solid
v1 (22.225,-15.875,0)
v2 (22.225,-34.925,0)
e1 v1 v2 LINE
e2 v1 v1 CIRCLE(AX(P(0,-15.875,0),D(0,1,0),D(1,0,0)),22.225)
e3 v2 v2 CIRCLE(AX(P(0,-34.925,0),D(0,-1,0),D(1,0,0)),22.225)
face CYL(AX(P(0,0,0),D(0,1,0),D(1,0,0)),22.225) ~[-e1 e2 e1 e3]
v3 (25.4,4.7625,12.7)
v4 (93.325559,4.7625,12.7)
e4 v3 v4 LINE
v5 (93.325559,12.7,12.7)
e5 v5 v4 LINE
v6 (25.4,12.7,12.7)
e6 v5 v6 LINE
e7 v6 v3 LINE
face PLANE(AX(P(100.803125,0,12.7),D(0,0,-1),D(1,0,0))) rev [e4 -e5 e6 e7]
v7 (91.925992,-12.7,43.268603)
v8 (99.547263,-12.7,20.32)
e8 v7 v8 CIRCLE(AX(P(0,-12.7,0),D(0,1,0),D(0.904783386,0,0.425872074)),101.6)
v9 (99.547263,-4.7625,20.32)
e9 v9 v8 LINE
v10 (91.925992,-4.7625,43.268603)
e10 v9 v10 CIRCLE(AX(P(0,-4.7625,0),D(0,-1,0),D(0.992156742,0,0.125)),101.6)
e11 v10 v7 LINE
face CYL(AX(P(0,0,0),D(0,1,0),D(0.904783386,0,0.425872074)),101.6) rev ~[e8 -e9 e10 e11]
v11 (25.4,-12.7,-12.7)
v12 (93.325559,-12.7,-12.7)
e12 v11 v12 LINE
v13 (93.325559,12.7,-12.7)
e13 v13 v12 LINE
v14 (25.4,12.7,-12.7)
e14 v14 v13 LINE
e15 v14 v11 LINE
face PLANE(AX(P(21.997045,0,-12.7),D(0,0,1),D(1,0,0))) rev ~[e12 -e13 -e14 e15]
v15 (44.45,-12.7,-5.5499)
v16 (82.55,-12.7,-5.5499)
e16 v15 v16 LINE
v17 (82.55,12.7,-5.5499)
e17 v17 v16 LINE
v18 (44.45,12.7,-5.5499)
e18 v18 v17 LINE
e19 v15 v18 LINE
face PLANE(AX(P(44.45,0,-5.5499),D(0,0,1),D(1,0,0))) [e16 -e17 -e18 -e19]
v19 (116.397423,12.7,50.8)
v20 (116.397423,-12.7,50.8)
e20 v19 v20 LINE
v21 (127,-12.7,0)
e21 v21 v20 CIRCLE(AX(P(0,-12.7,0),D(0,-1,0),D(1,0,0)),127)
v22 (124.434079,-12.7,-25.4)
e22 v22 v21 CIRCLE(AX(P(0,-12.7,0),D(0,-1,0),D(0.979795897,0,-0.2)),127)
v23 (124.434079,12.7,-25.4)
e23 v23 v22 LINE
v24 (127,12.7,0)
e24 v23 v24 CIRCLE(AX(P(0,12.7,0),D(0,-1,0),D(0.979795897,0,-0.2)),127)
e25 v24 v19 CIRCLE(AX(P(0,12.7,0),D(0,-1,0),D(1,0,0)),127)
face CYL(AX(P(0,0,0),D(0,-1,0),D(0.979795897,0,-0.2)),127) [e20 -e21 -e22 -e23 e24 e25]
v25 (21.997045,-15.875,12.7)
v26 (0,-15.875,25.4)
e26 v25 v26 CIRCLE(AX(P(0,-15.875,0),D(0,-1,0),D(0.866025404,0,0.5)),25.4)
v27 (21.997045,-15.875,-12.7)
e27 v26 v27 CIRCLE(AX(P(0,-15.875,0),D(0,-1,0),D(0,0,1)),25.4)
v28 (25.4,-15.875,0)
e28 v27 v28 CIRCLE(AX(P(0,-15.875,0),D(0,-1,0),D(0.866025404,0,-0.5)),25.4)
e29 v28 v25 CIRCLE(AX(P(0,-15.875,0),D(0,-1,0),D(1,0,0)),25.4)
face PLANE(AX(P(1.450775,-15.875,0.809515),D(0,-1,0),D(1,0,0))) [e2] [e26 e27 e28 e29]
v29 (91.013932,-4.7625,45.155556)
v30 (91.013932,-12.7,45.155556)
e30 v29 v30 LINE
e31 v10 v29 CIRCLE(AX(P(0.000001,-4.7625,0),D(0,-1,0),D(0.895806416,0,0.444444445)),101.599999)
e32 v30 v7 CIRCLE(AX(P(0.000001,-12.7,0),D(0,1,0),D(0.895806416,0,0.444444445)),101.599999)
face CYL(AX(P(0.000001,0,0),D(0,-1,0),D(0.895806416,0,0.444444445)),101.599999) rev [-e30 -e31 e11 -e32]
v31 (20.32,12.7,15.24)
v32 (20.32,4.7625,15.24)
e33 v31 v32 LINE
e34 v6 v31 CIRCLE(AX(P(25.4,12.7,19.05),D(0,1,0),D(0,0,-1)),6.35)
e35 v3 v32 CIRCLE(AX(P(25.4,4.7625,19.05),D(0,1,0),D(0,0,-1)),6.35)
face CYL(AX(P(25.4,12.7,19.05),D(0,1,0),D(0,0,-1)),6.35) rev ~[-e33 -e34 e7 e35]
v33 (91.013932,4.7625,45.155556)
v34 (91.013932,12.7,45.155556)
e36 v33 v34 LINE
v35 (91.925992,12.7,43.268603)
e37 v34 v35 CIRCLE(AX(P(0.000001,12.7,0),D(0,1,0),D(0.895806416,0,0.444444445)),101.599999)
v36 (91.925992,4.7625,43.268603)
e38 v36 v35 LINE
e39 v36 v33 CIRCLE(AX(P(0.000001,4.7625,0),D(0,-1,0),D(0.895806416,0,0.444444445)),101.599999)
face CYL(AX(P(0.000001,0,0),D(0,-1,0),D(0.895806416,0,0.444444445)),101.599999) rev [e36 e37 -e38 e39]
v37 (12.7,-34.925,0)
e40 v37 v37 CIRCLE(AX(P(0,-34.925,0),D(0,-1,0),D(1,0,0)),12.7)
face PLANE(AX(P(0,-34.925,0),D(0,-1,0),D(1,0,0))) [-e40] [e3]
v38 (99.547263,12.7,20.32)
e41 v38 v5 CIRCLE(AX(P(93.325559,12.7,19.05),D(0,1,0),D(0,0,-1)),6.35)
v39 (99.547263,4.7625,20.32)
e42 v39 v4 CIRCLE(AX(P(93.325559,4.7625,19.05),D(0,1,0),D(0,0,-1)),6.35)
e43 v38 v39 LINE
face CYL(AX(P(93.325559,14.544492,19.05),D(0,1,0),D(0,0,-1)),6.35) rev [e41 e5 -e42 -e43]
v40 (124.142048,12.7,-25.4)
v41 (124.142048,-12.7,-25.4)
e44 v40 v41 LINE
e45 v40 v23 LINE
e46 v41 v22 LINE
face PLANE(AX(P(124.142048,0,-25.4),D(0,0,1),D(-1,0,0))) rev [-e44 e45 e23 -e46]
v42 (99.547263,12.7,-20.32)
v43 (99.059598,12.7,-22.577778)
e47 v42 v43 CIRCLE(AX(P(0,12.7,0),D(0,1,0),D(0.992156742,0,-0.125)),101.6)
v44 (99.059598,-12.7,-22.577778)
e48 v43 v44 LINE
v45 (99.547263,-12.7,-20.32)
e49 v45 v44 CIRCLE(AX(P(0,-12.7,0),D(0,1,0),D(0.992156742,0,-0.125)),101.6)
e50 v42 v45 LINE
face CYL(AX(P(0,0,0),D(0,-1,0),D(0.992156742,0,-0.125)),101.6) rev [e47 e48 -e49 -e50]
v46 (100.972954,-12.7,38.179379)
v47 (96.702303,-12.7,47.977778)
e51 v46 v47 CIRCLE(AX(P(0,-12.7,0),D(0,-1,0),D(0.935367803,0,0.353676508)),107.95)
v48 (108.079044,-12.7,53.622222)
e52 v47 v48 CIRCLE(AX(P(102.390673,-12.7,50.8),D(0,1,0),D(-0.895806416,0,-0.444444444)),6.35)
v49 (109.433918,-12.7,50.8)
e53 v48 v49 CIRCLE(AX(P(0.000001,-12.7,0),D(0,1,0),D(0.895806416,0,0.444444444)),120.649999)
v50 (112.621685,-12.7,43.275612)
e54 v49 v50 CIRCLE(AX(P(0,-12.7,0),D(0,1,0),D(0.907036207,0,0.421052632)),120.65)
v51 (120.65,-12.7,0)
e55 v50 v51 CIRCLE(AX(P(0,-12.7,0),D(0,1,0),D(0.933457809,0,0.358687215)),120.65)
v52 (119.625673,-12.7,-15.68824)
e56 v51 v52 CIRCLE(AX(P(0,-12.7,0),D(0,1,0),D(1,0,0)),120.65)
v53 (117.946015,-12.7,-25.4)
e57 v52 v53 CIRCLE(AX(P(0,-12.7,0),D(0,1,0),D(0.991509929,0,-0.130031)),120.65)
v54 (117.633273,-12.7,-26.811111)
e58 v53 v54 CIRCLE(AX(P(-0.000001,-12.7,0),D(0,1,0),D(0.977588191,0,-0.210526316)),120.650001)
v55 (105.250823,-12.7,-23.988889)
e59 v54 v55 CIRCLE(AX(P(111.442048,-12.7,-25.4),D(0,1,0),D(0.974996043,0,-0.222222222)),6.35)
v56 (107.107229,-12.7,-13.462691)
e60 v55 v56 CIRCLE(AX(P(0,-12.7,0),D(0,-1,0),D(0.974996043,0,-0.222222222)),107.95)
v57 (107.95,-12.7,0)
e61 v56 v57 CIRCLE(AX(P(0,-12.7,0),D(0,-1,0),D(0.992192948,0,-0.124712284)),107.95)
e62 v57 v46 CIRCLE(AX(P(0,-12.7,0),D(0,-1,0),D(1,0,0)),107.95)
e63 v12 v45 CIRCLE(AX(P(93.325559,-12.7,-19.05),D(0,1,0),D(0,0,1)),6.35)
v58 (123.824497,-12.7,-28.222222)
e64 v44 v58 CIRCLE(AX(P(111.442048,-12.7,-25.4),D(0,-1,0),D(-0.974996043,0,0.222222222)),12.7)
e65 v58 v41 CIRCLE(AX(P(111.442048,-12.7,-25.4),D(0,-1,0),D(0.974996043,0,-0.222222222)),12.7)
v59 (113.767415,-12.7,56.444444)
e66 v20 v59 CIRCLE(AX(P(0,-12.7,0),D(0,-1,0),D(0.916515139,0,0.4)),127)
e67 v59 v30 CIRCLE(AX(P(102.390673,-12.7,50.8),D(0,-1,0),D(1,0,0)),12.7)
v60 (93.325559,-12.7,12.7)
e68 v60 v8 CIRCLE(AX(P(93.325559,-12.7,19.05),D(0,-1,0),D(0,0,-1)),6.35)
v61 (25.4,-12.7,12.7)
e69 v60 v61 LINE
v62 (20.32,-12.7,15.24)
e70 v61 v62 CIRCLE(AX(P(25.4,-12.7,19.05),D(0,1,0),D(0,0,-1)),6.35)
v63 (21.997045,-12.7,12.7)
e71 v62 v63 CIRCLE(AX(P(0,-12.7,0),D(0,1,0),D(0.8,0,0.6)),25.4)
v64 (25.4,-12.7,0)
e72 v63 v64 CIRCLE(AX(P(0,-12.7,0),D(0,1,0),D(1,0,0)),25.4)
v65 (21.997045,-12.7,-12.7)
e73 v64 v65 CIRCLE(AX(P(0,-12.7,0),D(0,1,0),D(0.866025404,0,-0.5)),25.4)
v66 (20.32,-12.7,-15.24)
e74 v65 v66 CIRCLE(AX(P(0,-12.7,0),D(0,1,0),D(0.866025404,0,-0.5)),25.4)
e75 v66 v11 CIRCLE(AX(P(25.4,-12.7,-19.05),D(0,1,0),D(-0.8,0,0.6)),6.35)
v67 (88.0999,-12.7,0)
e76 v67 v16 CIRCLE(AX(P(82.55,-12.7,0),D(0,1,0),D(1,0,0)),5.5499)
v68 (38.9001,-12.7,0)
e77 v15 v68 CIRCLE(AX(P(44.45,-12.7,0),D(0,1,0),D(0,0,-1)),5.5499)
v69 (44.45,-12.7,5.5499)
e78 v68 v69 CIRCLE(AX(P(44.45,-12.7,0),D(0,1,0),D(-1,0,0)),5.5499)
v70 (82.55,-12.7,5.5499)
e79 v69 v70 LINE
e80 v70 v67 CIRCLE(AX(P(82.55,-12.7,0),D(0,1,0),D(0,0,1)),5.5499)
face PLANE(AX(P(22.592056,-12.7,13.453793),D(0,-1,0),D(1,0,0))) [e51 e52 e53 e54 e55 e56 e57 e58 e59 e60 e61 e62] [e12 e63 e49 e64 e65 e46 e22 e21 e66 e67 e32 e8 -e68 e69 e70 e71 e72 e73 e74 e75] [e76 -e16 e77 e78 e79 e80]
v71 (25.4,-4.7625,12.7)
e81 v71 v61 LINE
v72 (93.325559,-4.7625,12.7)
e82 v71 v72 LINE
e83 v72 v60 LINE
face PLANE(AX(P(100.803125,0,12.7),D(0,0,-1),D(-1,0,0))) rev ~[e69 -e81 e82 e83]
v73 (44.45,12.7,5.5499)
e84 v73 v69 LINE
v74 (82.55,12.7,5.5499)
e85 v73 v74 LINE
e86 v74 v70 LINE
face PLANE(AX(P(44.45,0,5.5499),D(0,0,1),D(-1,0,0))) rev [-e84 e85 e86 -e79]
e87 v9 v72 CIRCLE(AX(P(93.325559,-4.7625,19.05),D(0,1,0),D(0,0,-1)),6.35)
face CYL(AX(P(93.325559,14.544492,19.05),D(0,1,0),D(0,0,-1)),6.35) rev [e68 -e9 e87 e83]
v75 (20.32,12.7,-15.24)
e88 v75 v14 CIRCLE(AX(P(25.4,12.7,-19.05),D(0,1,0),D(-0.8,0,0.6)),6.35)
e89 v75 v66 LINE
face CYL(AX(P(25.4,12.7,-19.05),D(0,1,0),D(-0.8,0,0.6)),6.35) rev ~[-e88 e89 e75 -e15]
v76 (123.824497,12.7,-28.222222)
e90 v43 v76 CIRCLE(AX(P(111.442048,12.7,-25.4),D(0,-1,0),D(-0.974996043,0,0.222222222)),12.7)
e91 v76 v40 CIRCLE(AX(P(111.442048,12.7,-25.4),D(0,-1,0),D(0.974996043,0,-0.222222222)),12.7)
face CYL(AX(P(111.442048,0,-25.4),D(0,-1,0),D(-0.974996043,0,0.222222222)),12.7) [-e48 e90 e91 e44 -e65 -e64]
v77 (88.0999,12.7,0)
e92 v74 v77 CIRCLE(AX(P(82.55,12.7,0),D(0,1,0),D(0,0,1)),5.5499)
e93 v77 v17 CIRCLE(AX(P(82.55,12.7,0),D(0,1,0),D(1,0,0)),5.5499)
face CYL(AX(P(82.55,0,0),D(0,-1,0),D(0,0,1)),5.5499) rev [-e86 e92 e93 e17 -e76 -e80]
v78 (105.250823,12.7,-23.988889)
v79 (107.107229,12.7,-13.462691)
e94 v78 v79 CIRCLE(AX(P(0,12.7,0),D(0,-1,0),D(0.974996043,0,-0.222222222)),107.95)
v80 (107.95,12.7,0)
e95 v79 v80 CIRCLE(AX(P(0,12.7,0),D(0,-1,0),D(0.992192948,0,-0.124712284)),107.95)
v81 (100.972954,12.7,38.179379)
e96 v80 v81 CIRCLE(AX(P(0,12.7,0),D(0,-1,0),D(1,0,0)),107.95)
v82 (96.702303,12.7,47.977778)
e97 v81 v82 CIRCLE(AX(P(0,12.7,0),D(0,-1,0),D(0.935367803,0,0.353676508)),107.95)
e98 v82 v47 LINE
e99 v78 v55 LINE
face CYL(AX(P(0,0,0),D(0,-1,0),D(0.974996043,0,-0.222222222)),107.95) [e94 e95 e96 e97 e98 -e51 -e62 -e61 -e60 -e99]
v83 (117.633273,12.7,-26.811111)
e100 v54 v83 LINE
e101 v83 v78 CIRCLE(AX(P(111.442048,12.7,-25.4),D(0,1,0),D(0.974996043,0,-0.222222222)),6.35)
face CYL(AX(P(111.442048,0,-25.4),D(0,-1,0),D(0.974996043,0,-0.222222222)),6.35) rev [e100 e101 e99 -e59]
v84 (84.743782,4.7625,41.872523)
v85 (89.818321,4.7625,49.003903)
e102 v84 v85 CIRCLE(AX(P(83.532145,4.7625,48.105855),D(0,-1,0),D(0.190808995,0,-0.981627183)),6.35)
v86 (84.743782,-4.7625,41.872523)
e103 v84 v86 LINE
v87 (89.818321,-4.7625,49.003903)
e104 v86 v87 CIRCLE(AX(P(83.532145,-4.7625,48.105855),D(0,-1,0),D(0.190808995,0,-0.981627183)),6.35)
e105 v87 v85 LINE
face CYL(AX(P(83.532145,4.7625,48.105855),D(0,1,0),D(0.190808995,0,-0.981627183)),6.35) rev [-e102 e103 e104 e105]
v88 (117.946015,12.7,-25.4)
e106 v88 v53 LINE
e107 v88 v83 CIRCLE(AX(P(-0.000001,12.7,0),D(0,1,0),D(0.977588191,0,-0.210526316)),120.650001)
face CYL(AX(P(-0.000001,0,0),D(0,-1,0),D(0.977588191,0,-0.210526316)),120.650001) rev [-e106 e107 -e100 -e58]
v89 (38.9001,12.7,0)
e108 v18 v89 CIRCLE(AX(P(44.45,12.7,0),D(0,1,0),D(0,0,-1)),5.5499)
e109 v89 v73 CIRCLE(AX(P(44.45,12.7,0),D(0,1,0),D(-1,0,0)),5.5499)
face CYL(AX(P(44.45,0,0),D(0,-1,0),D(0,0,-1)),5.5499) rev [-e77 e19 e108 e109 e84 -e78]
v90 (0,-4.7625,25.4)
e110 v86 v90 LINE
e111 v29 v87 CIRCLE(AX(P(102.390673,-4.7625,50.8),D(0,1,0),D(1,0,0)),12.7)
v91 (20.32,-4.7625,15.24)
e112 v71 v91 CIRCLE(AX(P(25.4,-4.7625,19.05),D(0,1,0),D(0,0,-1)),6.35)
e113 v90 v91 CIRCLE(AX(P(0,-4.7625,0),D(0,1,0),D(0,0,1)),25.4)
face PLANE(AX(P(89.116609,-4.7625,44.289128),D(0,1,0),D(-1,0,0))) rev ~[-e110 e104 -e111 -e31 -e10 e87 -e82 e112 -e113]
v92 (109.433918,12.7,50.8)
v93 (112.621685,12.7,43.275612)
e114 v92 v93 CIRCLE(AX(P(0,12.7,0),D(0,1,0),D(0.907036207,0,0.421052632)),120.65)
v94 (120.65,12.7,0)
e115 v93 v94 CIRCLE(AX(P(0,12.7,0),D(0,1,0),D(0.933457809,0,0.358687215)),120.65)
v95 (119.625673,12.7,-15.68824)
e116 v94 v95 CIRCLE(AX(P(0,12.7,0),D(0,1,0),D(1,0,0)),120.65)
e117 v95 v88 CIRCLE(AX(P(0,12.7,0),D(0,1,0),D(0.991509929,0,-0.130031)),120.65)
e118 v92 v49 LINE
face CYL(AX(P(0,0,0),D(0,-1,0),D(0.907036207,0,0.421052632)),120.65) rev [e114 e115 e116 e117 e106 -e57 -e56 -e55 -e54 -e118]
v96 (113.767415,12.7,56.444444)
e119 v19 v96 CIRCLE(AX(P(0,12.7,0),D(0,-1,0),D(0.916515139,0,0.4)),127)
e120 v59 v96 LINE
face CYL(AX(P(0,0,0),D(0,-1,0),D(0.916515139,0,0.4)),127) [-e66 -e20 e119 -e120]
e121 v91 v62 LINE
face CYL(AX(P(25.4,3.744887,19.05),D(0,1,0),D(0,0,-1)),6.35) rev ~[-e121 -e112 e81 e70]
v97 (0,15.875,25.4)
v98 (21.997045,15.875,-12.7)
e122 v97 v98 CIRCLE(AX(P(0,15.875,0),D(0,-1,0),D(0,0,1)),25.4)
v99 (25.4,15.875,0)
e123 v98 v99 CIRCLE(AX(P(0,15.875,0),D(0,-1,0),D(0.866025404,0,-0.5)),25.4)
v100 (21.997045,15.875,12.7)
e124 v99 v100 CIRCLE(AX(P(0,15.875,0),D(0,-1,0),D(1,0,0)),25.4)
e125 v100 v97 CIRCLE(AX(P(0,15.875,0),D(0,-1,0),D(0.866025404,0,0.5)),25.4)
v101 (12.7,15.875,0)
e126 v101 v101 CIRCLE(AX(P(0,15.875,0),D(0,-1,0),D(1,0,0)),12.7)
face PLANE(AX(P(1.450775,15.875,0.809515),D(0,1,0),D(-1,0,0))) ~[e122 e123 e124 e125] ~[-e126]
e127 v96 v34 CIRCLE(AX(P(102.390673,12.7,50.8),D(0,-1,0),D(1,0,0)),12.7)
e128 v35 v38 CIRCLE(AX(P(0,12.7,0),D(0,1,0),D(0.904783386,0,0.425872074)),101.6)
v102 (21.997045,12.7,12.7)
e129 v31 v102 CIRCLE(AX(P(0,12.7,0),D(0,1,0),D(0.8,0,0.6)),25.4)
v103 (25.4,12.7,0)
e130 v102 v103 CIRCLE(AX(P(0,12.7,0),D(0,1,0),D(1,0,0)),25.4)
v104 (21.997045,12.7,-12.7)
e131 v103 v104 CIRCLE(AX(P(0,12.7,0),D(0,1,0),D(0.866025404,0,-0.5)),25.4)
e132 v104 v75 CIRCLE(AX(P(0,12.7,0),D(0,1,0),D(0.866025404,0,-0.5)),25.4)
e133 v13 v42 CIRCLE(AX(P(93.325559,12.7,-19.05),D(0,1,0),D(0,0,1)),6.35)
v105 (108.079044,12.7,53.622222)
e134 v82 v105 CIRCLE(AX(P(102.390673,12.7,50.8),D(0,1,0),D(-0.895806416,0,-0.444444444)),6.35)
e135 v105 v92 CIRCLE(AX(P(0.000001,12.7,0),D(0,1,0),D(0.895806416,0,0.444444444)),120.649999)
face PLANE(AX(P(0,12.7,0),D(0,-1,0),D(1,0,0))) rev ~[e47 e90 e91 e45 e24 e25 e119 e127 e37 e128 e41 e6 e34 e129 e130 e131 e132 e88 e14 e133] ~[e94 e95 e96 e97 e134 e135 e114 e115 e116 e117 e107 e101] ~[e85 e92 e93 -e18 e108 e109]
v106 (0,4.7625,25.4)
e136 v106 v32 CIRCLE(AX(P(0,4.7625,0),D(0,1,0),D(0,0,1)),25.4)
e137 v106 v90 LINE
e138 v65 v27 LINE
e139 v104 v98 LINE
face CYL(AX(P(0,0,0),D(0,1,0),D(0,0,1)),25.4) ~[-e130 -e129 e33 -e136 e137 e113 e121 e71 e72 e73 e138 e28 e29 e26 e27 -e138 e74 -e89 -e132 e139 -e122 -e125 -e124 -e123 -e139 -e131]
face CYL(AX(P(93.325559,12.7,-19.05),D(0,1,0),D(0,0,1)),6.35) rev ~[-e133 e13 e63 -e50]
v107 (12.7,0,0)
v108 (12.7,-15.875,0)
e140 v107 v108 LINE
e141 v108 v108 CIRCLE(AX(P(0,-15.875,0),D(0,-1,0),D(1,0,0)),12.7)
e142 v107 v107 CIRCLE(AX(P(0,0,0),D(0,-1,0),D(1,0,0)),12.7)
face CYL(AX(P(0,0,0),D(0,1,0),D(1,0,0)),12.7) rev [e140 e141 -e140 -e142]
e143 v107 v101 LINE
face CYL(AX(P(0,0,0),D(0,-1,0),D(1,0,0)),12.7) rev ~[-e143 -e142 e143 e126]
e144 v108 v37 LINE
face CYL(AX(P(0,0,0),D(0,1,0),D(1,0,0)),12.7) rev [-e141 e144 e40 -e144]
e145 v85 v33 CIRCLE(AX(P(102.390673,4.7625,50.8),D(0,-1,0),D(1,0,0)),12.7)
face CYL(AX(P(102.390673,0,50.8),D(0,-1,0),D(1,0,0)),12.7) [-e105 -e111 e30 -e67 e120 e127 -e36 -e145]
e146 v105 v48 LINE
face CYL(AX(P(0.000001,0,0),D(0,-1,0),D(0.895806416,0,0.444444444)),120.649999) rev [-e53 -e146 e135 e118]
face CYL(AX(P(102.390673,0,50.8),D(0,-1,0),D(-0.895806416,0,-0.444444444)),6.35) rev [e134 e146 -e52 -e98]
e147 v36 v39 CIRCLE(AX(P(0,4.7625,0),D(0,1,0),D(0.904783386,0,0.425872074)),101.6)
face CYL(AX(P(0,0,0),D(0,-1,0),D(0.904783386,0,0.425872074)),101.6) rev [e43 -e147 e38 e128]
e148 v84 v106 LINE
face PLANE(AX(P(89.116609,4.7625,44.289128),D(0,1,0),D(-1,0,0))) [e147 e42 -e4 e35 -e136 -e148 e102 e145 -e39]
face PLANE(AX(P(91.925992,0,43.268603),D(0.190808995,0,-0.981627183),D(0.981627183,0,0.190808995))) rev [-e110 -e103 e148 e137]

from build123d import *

# Parameters (mm, degrees)
F0_W         = 38.1
F0_H         = 7.1501
F0_R         = 22.225
F0_R_2       = 12.7
F1_DEPTH     = 12.7
F2_DEPTH     = 15.875
F3_DEPTH     = 4.7625
F5_DEPTH     = 34.925
F6_T1_DEPTH  = 9.525
F6_T3_DEPTH  = 25.4
F6_T5_DEPTH  = 16.4448868597
F6_T7_DEPTH  = 16.4448868597
F6_T12_DEPTH = 27.2444917505
F6_T17_DEPTH = 27.2444917505


# Not quite as in the source:
# - a fillet or chamfer that OpenCascade refuses, or shapes differently, is made with other operations: its cross-section is extruded or revolved along the edge and cut away or added


with BuildPart() as f1:
    # F0 (on Front) → F1 (new body)
    with BuildSketch(Plane.XZ):
        with BuildLine():
            ThreePointArc((113.7674148927, 56.4444444444), (96.7462289589, 62.1767414893), (91.0139319141, 45.1555555556))
            ThreePointArc((91.0139319141, 45.1555555556), (95.1042946992, 40.3981402923), (100.9729543694, 38.1793790668))
            ThreePointArc((100.9729543694, 38.1793790668), (98.95897617, 43.1314680412), (96.7023026588, 47.9777777778))
            ThreePointArc((96.7023026588, 47.9777777778), (99.5684511812, 56.4883707446), (108.079044148, 53.6222222222))
            ThreePointArc((108.079044148, 53.6222222222), (108.7656354529, 52.2155057864), (109.4339184165, 50.8))
            Line((109.4339184165, 50.8), (115.0906734034, 50.8))
            ThreePointArc((115.0906734034, 50.8), (114.7554341555, 53.6987396474), (113.7674148927, 56.4444444444))
        make_face()
        with BuildLine():
            ThreePointArc((91.0139319141, 45.1555555556), (91.4748276489, 44.2144309769), (91.9259920573, 43.2686027539))
            ThreePointArc((91.9259920573, 43.2686027539), (97.5691447351, 28.3341136382), (100.8031249516, 12.7))
            ThreePointArc((100.8031249516, 12.7), (101.4005855384, 6.3624879144), (101.6, 0))
            Line((101.6, 0), (107.95, 0))
            ThreePointArc((107.95, 0), (106.1914142579, 19.405824845), (100.9729543694, 38.1793790668))
            ThreePointArc((100.9729543694, 38.1793790668), (95.1042946992, 40.3981402923), (91.0139319141, 45.1555555556))
        make_face()
        with BuildLine():
            ThreePointArc((101.6, 0), (101.4005855384, -6.3624879144), (100.8031249516, -12.7))
            ThreePointArc((100.8031249516, -12.7), (100.0533339134, -17.6604182514), (99.0595979732, -22.5777777778))
            ThreePointArc((99.0595979732, -22.5777777778), (101.9216501545, -16.9945237972), (107.1072287434, -13.462691072))
            ThreePointArc((107.1072287434, -13.462691072), (107.7391011724, -6.744522116), (107.95, 0))
            Line((107.95, 0), (101.6, 0))
        make_face()
        with BuildLine():
            ThreePointArc((124.4340789334, -25.4), (126.3568914317, -12.7646381747), (127, 0))
            Line((127, 0), (120.65, 0))
            ThreePointArc((120.65, 0), (120.3936458808, -7.8608225729), (119.625672913, -15.6882401853))
            ThreePointArc((119.625672913, -15.6882401853), (122.957733543, -20.0447240945), (124.1420477199, -25.4))
            Line((124.1420477199, -25.4), (124.4340789334, -25.4))
        make_face()
        with BuildLine():
            Line((116.3974226519, 50.8), (115.0906734034, 50.8))
            ThreePointArc((115.0906734034, 50.8), (114.4576498997, 46.8404446919), (112.6216847044, 43.2756124663))
            ThreePointArc((112.6216847044, 43.2756124663), (118.6259431145, 22.0070016178), (120.65, 0))
            Line((120.65, 0), (127, 0))
            ThreePointArc((127, 0), (124.3211017422, 25.9473247485), (116.3974226519, 50.8))
        make_face()
        with BuildLine():
            Line((117.9460151934, -25.4), (124.1420477199, -25.4))
            ThreePointArc((124.1420477199, -25.4), (122.957733543, -20.0447240945), (119.625672913, -15.6882401853))
            ThreePointArc((119.625672913, -15.6882401853), (118.885055062, -20.5612787271), (117.9460151934, -25.4))
        make_face()
        with BuildLine():
            ThreePointArc((107.1072287434, -13.462691072), (101.9216501545, -16.9945237972), (99.0595979732, -22.5777777778))
            ThreePointArc((99.0595979732, -22.5777777778), (108.6198254977, -37.7824497467), (123.8244974665, -28.2222222222))
            ThreePointArc((123.8244974665, -28.2222222222), (124.0624104679, -26.8200155312), (124.1420477199, -25.4))
            Line((124.1420477199, -25.4), (117.9460151934, -25.4))
            ThreePointArc((117.9460151934, -25.4), (117.791757, -26.1060238805), (117.6332725932, -26.8111111111))
            ThreePointArc((117.6332725932, -26.8111111111), (110.0309366088, -31.5912248733), (105.2508228466, -23.9888888889))
            ThreePointArc((105.2508228466, -23.9888888889), (106.3093868334, -18.7487805232), (107.1072287434, -13.462691072))
        make_face()
        with BuildLine():
            ThreePointArc((112.6216847044, 43.2756124663), (114.4576498997, 46.8404446919), (115.0906734034, 50.8))
            Line((115.0906734034, 50.8), (109.4339184165, 50.8))
            ThreePointArc((109.4339184165, 50.8), (111.091524525, 47.064802971), (112.6216847044, 43.2756124663))
        make_face()
        with BuildLine():
            ThreePointArc((116.3974226519, 50.8), (115.1170189362, 53.6383440391), (113.7674148927, 56.4444444444))
            ThreePointArc((113.7674148927, 56.4444444444), (114.7554341555, 53.6987396474), (115.0906734034, 50.8))
            Line((115.0906734034, 50.8), (116.3974226519, 50.8))
        make_face()
        with BuildLine():
            ThreePointArc((21.9970452561, 12.7), (24.5345159877, 6.5740037456), (25.4, 0))
            Line((25.4, 0), (38.9001, 0))
            ThreePointArc((38.9001, 0), (40.5256280751, 3.9243719249), (44.45, 5.5499))
            Line((44.45, 5.5499), (44.45, 12.7))
            Line((44.45, 12.7), (21.9970452561, 12.7))
        make_face()
        with Locations((63.5, 9.12495)):
            Rectangle(F0_W, F0_H)
        with BuildLine():
            Line((82.55, 12.7), (82.55, 5.5499))
            ThreePointArc((82.55, 5.5499), (86.4743719249, 3.9243719249), (88.0999, 0))
            Line((88.0999, 0), (101.6, 0))
            ThreePointArc((101.6, 0), (101.4005855384, 6.3624879144), (100.8031249516, 12.7))
            Line((100.8031249516, 12.7), (82.55, 12.7))
        make_face()
        with BuildLine():
            ThreePointArc((88.0999, 0), (86.4743719249, -3.9243719249), (82.55, -5.5499))
            Line((82.55, -5.5499), (82.55, -12.7))
            Line((82.55, -12.7), (100.8031249516, -12.7))
            ThreePointArc((100.8031249516, -12.7), (101.4005855384, -6.3624879144), (101.6, 0))
            Line((101.6, 0), (88.0999, 0))
        make_face()
        with Locations((63.5, -9.12495)):
            Rectangle(F0_W, F0_H)
        with BuildLine():
            Line((38.9001, 0), (25.4, 0))
            ThreePointArc((25.4, 0), (24.5345159877, -6.5740037456), (21.9970452561, -12.7))
            Line((21.9970452561, -12.7), (44.45, -12.7))
            Line((44.45, -12.7), (44.45, -5.5499))
            ThreePointArc((44.45, -5.5499), (40.5256280751, -3.9243719249), (38.9001, 0))
        make_face()
        with BuildLine():
            ThreePointArc((21.9970452561, -12.7), (24.5345159877, -6.5740037456), (25.4, 0))
            ThreePointArc((25.4, 0), (24.5345159877, 6.5740037456), (21.9970452561, 12.7))
            ThreePointArc((21.9970452561, 12.7), (12.7, 21.9970452561), (0, 25.4))
            ThreePointArc((0, 25.4), (-21.9970452561, -12.7), (21.9970452561, -12.7))
        make_face()
        Circle(F0_R, mode=Mode.SUBTRACT)
        Circle(F0_R)
        Circle(F0_R_2, mode=Mode.SUBTRACT)
    extrude(amount=F1_DEPTH)

    # F0 (on Front) → F2 (join)
    with BuildSketch(Plane.XZ):
        with BuildLine():
            ThreePointArc((21.9970452561, -12.7), (24.5345159877, -6.5740037456), (25.4, 0))
            ThreePointArc((25.4, 0), (24.5345159877, 6.5740037456), (21.9970452561, 12.7))
            ThreePointArc((21.9970452561, 12.7), (12.7, 21.9970452561), (0, 25.4))
            ThreePointArc((0, 25.4), (-21.9970452561, -12.7), (21.9970452561, -12.7))
        make_face()
        Circle(F0_R, mode=Mode.SUBTRACT)
        Circle(F0_R)
        Circle(F0_R_2, mode=Mode.SUBTRACT)
    extrude(amount=F2_DEPTH)

    # F0 (on Front) → F3 (join)
    with BuildSketch(Plane.XZ):
        with BuildLine():
            ThreePointArc((0, 25.4), (12.7, 21.9970452561), (21.9970452561, 12.7))
            Line((21.9970452561, 12.7), (44.45, 12.7))
            Line((44.45, 12.7), (82.55, 12.7))
            Line((82.55, 12.7), (100.8031249516, 12.7))
            ThreePointArc((100.8031249516, 12.7), (97.5691447351, 28.3341136382), (91.9259920573, 43.2686027539))
            Line((91.9259920573, 43.2686027539), (0, 25.4))
        make_face()
    extrude(amount=F3_DEPTH)

    # F4: F1 across face


with BuildPart() as f1_1:
    add(f1.part)
    add(f1.part.mirror(Plane.XZ))

    # F0 (on Front) → F5 (join)
    with BuildSketch(Plane.XZ):
        Circle(F0_R)
        Circle(F0_R_2, mode=Mode.SUBTRACT)
    extrude(amount=F5_DEPTH)

    # F6: fillet of radius 6.35 on 7 edges, made by hand

    # F6_s2 → F6_t1 (join)
    with BuildSketch(Plane.XZ.offset(-4.7625)):
        with BuildLine():
            ThreePointArc((84.7437823747, 41.8725226155), (88.7059686824, 44.4242725365), (89.8183213038, 49.0039034869))
            Line((89.8183213038, 49.0039034869), (90.4469389088, 49.0937083126))
            ThreePointArc((90.4469389088, 49.0937083126), (91.5827689886, 45.4377777778), (92.5005295077, 43.5390315211))
            Line((92.5005295077, 43.5390315211), (92.0471557694, 42.6452694924))
            Line((92.0471557694, 42.6452694924), (84.8649460867, 41.249189354))
            Line((84.8649460867, 41.249189354), (84.7437823747, 41.8725226155))
        make_face()
    extrude(amount=F6_T1_DEPTH)

    # F6_s4 → F6_t3 (join)
    with BuildSketch(Plane.XZ.offset(-12.7)):
        with BuildLine():
            ThreePointArc((93.3255592, -12.7), (98.2442480497, -15.0339073716), (99.5472631467, -20.32))
            ThreePointArc((99.5472631467, -20.32), (100.247621432, -16.5219368483), (100.8031249516, -12.7))
            Line((100.8031249516, -12.7), (93.3255592, -12.7))
        make_face()
        with BuildLine():
            ThreePointArc((20.32, -15.24), (22.5601936686, -13.3703873372), (25.4, -12.7))
            Line((25.4, -12.7), (21.9970452561, -12.7))
            ThreePointArc((21.9970452561, -12.7), (21.1966030251, -13.9951427359), (20.32, -15.24))
        make_face()
    extrude(amount=F6_T3_DEPTH)

    # F6_s6 → F6_t5 (join)
    with BuildSketch(Plane.XZ.offset(-3.7448868597)):
        with BuildLine():
            ThreePointArc((25.4, 12.7), (22.5601936686, 13.3703873372), (20.32, 15.24))
            ThreePointArc((20.32, 15.24), (21.1966030251, 13.9951427359), (21.9970452561, 12.7))
            Line((21.9970452561, 12.7), (25.4, 12.7))
        make_face()
    extrude(amount=F6_T5_DEPTH)

    # F6_s8 → F6_t7 (join)
    with BuildSketch(Plane.XZ.offset(-12.7)):
        with BuildLine():
            ThreePointArc((25.4, 12.7), (22.5601936686, 13.3703873372), (20.32, 15.24))
            ThreePointArc((20.32, 15.24), (21.1966030251, 13.9951427359), (21.9970452561, 12.7))
            Line((21.9970452561, 12.7), (25.4, 12.7))
        make_face()
    extrude(amount=F6_T7_DEPTH)


with BuildPart() as f6_tool10:
    # F6_s11 → F6_t12 (new body)
    with BuildSketch(Plane.XZ.offset(-14.5444917505)):
        with BuildLine():
            ThreePointArc((93.3255592, 12.7), (98.2442480497, 15.0339073716), (99.5472631467, 20.32))
            ThreePointArc((99.5472631467, 20.32), (100.247621432, 16.5219368483), (100.8031249516, 12.7))
            Line((100.8031249516, 12.7), (93.3255592, 12.7))
        make_face()
    extrude(amount=F6_T12_DEPTH)

    split(bisect_by=Plane.XZ.offset(-12.7), keep=Keep.TOP)


with BuildPart() as f1_2:
    add(f1_1.part)

    # F6_t9: union F6_tool10
    add(f6_tool10.part)


with BuildPart() as f6_tool15:
    # F6_s16 → F6_t17 (new body)
    with BuildSketch(Plane.XZ.offset(14.5444917505)):
        with BuildLine():
            ThreePointArc((93.3255592, 12.7), (98.2442480497, 15.0339073716), (99.5472631467, 20.32))
            ThreePointArc((99.5472631467, 20.32), (100.247621432, 16.5219368483), (100.8031249516, 12.7))
            Line((100.8031249516, 12.7), (93.3255592, 12.7))
        make_face()
    extrude(amount=-F6_T17_DEPTH)

    split(bisect_by=Plane.XZ.offset(12.7), keep=Keep.BOTTOM)


with BuildPart() as f1_3:
    add(f1_2.part)

    # F6_t14: union F6_tool15
    add(f6_tool15.part)


solid = f1_3.part
